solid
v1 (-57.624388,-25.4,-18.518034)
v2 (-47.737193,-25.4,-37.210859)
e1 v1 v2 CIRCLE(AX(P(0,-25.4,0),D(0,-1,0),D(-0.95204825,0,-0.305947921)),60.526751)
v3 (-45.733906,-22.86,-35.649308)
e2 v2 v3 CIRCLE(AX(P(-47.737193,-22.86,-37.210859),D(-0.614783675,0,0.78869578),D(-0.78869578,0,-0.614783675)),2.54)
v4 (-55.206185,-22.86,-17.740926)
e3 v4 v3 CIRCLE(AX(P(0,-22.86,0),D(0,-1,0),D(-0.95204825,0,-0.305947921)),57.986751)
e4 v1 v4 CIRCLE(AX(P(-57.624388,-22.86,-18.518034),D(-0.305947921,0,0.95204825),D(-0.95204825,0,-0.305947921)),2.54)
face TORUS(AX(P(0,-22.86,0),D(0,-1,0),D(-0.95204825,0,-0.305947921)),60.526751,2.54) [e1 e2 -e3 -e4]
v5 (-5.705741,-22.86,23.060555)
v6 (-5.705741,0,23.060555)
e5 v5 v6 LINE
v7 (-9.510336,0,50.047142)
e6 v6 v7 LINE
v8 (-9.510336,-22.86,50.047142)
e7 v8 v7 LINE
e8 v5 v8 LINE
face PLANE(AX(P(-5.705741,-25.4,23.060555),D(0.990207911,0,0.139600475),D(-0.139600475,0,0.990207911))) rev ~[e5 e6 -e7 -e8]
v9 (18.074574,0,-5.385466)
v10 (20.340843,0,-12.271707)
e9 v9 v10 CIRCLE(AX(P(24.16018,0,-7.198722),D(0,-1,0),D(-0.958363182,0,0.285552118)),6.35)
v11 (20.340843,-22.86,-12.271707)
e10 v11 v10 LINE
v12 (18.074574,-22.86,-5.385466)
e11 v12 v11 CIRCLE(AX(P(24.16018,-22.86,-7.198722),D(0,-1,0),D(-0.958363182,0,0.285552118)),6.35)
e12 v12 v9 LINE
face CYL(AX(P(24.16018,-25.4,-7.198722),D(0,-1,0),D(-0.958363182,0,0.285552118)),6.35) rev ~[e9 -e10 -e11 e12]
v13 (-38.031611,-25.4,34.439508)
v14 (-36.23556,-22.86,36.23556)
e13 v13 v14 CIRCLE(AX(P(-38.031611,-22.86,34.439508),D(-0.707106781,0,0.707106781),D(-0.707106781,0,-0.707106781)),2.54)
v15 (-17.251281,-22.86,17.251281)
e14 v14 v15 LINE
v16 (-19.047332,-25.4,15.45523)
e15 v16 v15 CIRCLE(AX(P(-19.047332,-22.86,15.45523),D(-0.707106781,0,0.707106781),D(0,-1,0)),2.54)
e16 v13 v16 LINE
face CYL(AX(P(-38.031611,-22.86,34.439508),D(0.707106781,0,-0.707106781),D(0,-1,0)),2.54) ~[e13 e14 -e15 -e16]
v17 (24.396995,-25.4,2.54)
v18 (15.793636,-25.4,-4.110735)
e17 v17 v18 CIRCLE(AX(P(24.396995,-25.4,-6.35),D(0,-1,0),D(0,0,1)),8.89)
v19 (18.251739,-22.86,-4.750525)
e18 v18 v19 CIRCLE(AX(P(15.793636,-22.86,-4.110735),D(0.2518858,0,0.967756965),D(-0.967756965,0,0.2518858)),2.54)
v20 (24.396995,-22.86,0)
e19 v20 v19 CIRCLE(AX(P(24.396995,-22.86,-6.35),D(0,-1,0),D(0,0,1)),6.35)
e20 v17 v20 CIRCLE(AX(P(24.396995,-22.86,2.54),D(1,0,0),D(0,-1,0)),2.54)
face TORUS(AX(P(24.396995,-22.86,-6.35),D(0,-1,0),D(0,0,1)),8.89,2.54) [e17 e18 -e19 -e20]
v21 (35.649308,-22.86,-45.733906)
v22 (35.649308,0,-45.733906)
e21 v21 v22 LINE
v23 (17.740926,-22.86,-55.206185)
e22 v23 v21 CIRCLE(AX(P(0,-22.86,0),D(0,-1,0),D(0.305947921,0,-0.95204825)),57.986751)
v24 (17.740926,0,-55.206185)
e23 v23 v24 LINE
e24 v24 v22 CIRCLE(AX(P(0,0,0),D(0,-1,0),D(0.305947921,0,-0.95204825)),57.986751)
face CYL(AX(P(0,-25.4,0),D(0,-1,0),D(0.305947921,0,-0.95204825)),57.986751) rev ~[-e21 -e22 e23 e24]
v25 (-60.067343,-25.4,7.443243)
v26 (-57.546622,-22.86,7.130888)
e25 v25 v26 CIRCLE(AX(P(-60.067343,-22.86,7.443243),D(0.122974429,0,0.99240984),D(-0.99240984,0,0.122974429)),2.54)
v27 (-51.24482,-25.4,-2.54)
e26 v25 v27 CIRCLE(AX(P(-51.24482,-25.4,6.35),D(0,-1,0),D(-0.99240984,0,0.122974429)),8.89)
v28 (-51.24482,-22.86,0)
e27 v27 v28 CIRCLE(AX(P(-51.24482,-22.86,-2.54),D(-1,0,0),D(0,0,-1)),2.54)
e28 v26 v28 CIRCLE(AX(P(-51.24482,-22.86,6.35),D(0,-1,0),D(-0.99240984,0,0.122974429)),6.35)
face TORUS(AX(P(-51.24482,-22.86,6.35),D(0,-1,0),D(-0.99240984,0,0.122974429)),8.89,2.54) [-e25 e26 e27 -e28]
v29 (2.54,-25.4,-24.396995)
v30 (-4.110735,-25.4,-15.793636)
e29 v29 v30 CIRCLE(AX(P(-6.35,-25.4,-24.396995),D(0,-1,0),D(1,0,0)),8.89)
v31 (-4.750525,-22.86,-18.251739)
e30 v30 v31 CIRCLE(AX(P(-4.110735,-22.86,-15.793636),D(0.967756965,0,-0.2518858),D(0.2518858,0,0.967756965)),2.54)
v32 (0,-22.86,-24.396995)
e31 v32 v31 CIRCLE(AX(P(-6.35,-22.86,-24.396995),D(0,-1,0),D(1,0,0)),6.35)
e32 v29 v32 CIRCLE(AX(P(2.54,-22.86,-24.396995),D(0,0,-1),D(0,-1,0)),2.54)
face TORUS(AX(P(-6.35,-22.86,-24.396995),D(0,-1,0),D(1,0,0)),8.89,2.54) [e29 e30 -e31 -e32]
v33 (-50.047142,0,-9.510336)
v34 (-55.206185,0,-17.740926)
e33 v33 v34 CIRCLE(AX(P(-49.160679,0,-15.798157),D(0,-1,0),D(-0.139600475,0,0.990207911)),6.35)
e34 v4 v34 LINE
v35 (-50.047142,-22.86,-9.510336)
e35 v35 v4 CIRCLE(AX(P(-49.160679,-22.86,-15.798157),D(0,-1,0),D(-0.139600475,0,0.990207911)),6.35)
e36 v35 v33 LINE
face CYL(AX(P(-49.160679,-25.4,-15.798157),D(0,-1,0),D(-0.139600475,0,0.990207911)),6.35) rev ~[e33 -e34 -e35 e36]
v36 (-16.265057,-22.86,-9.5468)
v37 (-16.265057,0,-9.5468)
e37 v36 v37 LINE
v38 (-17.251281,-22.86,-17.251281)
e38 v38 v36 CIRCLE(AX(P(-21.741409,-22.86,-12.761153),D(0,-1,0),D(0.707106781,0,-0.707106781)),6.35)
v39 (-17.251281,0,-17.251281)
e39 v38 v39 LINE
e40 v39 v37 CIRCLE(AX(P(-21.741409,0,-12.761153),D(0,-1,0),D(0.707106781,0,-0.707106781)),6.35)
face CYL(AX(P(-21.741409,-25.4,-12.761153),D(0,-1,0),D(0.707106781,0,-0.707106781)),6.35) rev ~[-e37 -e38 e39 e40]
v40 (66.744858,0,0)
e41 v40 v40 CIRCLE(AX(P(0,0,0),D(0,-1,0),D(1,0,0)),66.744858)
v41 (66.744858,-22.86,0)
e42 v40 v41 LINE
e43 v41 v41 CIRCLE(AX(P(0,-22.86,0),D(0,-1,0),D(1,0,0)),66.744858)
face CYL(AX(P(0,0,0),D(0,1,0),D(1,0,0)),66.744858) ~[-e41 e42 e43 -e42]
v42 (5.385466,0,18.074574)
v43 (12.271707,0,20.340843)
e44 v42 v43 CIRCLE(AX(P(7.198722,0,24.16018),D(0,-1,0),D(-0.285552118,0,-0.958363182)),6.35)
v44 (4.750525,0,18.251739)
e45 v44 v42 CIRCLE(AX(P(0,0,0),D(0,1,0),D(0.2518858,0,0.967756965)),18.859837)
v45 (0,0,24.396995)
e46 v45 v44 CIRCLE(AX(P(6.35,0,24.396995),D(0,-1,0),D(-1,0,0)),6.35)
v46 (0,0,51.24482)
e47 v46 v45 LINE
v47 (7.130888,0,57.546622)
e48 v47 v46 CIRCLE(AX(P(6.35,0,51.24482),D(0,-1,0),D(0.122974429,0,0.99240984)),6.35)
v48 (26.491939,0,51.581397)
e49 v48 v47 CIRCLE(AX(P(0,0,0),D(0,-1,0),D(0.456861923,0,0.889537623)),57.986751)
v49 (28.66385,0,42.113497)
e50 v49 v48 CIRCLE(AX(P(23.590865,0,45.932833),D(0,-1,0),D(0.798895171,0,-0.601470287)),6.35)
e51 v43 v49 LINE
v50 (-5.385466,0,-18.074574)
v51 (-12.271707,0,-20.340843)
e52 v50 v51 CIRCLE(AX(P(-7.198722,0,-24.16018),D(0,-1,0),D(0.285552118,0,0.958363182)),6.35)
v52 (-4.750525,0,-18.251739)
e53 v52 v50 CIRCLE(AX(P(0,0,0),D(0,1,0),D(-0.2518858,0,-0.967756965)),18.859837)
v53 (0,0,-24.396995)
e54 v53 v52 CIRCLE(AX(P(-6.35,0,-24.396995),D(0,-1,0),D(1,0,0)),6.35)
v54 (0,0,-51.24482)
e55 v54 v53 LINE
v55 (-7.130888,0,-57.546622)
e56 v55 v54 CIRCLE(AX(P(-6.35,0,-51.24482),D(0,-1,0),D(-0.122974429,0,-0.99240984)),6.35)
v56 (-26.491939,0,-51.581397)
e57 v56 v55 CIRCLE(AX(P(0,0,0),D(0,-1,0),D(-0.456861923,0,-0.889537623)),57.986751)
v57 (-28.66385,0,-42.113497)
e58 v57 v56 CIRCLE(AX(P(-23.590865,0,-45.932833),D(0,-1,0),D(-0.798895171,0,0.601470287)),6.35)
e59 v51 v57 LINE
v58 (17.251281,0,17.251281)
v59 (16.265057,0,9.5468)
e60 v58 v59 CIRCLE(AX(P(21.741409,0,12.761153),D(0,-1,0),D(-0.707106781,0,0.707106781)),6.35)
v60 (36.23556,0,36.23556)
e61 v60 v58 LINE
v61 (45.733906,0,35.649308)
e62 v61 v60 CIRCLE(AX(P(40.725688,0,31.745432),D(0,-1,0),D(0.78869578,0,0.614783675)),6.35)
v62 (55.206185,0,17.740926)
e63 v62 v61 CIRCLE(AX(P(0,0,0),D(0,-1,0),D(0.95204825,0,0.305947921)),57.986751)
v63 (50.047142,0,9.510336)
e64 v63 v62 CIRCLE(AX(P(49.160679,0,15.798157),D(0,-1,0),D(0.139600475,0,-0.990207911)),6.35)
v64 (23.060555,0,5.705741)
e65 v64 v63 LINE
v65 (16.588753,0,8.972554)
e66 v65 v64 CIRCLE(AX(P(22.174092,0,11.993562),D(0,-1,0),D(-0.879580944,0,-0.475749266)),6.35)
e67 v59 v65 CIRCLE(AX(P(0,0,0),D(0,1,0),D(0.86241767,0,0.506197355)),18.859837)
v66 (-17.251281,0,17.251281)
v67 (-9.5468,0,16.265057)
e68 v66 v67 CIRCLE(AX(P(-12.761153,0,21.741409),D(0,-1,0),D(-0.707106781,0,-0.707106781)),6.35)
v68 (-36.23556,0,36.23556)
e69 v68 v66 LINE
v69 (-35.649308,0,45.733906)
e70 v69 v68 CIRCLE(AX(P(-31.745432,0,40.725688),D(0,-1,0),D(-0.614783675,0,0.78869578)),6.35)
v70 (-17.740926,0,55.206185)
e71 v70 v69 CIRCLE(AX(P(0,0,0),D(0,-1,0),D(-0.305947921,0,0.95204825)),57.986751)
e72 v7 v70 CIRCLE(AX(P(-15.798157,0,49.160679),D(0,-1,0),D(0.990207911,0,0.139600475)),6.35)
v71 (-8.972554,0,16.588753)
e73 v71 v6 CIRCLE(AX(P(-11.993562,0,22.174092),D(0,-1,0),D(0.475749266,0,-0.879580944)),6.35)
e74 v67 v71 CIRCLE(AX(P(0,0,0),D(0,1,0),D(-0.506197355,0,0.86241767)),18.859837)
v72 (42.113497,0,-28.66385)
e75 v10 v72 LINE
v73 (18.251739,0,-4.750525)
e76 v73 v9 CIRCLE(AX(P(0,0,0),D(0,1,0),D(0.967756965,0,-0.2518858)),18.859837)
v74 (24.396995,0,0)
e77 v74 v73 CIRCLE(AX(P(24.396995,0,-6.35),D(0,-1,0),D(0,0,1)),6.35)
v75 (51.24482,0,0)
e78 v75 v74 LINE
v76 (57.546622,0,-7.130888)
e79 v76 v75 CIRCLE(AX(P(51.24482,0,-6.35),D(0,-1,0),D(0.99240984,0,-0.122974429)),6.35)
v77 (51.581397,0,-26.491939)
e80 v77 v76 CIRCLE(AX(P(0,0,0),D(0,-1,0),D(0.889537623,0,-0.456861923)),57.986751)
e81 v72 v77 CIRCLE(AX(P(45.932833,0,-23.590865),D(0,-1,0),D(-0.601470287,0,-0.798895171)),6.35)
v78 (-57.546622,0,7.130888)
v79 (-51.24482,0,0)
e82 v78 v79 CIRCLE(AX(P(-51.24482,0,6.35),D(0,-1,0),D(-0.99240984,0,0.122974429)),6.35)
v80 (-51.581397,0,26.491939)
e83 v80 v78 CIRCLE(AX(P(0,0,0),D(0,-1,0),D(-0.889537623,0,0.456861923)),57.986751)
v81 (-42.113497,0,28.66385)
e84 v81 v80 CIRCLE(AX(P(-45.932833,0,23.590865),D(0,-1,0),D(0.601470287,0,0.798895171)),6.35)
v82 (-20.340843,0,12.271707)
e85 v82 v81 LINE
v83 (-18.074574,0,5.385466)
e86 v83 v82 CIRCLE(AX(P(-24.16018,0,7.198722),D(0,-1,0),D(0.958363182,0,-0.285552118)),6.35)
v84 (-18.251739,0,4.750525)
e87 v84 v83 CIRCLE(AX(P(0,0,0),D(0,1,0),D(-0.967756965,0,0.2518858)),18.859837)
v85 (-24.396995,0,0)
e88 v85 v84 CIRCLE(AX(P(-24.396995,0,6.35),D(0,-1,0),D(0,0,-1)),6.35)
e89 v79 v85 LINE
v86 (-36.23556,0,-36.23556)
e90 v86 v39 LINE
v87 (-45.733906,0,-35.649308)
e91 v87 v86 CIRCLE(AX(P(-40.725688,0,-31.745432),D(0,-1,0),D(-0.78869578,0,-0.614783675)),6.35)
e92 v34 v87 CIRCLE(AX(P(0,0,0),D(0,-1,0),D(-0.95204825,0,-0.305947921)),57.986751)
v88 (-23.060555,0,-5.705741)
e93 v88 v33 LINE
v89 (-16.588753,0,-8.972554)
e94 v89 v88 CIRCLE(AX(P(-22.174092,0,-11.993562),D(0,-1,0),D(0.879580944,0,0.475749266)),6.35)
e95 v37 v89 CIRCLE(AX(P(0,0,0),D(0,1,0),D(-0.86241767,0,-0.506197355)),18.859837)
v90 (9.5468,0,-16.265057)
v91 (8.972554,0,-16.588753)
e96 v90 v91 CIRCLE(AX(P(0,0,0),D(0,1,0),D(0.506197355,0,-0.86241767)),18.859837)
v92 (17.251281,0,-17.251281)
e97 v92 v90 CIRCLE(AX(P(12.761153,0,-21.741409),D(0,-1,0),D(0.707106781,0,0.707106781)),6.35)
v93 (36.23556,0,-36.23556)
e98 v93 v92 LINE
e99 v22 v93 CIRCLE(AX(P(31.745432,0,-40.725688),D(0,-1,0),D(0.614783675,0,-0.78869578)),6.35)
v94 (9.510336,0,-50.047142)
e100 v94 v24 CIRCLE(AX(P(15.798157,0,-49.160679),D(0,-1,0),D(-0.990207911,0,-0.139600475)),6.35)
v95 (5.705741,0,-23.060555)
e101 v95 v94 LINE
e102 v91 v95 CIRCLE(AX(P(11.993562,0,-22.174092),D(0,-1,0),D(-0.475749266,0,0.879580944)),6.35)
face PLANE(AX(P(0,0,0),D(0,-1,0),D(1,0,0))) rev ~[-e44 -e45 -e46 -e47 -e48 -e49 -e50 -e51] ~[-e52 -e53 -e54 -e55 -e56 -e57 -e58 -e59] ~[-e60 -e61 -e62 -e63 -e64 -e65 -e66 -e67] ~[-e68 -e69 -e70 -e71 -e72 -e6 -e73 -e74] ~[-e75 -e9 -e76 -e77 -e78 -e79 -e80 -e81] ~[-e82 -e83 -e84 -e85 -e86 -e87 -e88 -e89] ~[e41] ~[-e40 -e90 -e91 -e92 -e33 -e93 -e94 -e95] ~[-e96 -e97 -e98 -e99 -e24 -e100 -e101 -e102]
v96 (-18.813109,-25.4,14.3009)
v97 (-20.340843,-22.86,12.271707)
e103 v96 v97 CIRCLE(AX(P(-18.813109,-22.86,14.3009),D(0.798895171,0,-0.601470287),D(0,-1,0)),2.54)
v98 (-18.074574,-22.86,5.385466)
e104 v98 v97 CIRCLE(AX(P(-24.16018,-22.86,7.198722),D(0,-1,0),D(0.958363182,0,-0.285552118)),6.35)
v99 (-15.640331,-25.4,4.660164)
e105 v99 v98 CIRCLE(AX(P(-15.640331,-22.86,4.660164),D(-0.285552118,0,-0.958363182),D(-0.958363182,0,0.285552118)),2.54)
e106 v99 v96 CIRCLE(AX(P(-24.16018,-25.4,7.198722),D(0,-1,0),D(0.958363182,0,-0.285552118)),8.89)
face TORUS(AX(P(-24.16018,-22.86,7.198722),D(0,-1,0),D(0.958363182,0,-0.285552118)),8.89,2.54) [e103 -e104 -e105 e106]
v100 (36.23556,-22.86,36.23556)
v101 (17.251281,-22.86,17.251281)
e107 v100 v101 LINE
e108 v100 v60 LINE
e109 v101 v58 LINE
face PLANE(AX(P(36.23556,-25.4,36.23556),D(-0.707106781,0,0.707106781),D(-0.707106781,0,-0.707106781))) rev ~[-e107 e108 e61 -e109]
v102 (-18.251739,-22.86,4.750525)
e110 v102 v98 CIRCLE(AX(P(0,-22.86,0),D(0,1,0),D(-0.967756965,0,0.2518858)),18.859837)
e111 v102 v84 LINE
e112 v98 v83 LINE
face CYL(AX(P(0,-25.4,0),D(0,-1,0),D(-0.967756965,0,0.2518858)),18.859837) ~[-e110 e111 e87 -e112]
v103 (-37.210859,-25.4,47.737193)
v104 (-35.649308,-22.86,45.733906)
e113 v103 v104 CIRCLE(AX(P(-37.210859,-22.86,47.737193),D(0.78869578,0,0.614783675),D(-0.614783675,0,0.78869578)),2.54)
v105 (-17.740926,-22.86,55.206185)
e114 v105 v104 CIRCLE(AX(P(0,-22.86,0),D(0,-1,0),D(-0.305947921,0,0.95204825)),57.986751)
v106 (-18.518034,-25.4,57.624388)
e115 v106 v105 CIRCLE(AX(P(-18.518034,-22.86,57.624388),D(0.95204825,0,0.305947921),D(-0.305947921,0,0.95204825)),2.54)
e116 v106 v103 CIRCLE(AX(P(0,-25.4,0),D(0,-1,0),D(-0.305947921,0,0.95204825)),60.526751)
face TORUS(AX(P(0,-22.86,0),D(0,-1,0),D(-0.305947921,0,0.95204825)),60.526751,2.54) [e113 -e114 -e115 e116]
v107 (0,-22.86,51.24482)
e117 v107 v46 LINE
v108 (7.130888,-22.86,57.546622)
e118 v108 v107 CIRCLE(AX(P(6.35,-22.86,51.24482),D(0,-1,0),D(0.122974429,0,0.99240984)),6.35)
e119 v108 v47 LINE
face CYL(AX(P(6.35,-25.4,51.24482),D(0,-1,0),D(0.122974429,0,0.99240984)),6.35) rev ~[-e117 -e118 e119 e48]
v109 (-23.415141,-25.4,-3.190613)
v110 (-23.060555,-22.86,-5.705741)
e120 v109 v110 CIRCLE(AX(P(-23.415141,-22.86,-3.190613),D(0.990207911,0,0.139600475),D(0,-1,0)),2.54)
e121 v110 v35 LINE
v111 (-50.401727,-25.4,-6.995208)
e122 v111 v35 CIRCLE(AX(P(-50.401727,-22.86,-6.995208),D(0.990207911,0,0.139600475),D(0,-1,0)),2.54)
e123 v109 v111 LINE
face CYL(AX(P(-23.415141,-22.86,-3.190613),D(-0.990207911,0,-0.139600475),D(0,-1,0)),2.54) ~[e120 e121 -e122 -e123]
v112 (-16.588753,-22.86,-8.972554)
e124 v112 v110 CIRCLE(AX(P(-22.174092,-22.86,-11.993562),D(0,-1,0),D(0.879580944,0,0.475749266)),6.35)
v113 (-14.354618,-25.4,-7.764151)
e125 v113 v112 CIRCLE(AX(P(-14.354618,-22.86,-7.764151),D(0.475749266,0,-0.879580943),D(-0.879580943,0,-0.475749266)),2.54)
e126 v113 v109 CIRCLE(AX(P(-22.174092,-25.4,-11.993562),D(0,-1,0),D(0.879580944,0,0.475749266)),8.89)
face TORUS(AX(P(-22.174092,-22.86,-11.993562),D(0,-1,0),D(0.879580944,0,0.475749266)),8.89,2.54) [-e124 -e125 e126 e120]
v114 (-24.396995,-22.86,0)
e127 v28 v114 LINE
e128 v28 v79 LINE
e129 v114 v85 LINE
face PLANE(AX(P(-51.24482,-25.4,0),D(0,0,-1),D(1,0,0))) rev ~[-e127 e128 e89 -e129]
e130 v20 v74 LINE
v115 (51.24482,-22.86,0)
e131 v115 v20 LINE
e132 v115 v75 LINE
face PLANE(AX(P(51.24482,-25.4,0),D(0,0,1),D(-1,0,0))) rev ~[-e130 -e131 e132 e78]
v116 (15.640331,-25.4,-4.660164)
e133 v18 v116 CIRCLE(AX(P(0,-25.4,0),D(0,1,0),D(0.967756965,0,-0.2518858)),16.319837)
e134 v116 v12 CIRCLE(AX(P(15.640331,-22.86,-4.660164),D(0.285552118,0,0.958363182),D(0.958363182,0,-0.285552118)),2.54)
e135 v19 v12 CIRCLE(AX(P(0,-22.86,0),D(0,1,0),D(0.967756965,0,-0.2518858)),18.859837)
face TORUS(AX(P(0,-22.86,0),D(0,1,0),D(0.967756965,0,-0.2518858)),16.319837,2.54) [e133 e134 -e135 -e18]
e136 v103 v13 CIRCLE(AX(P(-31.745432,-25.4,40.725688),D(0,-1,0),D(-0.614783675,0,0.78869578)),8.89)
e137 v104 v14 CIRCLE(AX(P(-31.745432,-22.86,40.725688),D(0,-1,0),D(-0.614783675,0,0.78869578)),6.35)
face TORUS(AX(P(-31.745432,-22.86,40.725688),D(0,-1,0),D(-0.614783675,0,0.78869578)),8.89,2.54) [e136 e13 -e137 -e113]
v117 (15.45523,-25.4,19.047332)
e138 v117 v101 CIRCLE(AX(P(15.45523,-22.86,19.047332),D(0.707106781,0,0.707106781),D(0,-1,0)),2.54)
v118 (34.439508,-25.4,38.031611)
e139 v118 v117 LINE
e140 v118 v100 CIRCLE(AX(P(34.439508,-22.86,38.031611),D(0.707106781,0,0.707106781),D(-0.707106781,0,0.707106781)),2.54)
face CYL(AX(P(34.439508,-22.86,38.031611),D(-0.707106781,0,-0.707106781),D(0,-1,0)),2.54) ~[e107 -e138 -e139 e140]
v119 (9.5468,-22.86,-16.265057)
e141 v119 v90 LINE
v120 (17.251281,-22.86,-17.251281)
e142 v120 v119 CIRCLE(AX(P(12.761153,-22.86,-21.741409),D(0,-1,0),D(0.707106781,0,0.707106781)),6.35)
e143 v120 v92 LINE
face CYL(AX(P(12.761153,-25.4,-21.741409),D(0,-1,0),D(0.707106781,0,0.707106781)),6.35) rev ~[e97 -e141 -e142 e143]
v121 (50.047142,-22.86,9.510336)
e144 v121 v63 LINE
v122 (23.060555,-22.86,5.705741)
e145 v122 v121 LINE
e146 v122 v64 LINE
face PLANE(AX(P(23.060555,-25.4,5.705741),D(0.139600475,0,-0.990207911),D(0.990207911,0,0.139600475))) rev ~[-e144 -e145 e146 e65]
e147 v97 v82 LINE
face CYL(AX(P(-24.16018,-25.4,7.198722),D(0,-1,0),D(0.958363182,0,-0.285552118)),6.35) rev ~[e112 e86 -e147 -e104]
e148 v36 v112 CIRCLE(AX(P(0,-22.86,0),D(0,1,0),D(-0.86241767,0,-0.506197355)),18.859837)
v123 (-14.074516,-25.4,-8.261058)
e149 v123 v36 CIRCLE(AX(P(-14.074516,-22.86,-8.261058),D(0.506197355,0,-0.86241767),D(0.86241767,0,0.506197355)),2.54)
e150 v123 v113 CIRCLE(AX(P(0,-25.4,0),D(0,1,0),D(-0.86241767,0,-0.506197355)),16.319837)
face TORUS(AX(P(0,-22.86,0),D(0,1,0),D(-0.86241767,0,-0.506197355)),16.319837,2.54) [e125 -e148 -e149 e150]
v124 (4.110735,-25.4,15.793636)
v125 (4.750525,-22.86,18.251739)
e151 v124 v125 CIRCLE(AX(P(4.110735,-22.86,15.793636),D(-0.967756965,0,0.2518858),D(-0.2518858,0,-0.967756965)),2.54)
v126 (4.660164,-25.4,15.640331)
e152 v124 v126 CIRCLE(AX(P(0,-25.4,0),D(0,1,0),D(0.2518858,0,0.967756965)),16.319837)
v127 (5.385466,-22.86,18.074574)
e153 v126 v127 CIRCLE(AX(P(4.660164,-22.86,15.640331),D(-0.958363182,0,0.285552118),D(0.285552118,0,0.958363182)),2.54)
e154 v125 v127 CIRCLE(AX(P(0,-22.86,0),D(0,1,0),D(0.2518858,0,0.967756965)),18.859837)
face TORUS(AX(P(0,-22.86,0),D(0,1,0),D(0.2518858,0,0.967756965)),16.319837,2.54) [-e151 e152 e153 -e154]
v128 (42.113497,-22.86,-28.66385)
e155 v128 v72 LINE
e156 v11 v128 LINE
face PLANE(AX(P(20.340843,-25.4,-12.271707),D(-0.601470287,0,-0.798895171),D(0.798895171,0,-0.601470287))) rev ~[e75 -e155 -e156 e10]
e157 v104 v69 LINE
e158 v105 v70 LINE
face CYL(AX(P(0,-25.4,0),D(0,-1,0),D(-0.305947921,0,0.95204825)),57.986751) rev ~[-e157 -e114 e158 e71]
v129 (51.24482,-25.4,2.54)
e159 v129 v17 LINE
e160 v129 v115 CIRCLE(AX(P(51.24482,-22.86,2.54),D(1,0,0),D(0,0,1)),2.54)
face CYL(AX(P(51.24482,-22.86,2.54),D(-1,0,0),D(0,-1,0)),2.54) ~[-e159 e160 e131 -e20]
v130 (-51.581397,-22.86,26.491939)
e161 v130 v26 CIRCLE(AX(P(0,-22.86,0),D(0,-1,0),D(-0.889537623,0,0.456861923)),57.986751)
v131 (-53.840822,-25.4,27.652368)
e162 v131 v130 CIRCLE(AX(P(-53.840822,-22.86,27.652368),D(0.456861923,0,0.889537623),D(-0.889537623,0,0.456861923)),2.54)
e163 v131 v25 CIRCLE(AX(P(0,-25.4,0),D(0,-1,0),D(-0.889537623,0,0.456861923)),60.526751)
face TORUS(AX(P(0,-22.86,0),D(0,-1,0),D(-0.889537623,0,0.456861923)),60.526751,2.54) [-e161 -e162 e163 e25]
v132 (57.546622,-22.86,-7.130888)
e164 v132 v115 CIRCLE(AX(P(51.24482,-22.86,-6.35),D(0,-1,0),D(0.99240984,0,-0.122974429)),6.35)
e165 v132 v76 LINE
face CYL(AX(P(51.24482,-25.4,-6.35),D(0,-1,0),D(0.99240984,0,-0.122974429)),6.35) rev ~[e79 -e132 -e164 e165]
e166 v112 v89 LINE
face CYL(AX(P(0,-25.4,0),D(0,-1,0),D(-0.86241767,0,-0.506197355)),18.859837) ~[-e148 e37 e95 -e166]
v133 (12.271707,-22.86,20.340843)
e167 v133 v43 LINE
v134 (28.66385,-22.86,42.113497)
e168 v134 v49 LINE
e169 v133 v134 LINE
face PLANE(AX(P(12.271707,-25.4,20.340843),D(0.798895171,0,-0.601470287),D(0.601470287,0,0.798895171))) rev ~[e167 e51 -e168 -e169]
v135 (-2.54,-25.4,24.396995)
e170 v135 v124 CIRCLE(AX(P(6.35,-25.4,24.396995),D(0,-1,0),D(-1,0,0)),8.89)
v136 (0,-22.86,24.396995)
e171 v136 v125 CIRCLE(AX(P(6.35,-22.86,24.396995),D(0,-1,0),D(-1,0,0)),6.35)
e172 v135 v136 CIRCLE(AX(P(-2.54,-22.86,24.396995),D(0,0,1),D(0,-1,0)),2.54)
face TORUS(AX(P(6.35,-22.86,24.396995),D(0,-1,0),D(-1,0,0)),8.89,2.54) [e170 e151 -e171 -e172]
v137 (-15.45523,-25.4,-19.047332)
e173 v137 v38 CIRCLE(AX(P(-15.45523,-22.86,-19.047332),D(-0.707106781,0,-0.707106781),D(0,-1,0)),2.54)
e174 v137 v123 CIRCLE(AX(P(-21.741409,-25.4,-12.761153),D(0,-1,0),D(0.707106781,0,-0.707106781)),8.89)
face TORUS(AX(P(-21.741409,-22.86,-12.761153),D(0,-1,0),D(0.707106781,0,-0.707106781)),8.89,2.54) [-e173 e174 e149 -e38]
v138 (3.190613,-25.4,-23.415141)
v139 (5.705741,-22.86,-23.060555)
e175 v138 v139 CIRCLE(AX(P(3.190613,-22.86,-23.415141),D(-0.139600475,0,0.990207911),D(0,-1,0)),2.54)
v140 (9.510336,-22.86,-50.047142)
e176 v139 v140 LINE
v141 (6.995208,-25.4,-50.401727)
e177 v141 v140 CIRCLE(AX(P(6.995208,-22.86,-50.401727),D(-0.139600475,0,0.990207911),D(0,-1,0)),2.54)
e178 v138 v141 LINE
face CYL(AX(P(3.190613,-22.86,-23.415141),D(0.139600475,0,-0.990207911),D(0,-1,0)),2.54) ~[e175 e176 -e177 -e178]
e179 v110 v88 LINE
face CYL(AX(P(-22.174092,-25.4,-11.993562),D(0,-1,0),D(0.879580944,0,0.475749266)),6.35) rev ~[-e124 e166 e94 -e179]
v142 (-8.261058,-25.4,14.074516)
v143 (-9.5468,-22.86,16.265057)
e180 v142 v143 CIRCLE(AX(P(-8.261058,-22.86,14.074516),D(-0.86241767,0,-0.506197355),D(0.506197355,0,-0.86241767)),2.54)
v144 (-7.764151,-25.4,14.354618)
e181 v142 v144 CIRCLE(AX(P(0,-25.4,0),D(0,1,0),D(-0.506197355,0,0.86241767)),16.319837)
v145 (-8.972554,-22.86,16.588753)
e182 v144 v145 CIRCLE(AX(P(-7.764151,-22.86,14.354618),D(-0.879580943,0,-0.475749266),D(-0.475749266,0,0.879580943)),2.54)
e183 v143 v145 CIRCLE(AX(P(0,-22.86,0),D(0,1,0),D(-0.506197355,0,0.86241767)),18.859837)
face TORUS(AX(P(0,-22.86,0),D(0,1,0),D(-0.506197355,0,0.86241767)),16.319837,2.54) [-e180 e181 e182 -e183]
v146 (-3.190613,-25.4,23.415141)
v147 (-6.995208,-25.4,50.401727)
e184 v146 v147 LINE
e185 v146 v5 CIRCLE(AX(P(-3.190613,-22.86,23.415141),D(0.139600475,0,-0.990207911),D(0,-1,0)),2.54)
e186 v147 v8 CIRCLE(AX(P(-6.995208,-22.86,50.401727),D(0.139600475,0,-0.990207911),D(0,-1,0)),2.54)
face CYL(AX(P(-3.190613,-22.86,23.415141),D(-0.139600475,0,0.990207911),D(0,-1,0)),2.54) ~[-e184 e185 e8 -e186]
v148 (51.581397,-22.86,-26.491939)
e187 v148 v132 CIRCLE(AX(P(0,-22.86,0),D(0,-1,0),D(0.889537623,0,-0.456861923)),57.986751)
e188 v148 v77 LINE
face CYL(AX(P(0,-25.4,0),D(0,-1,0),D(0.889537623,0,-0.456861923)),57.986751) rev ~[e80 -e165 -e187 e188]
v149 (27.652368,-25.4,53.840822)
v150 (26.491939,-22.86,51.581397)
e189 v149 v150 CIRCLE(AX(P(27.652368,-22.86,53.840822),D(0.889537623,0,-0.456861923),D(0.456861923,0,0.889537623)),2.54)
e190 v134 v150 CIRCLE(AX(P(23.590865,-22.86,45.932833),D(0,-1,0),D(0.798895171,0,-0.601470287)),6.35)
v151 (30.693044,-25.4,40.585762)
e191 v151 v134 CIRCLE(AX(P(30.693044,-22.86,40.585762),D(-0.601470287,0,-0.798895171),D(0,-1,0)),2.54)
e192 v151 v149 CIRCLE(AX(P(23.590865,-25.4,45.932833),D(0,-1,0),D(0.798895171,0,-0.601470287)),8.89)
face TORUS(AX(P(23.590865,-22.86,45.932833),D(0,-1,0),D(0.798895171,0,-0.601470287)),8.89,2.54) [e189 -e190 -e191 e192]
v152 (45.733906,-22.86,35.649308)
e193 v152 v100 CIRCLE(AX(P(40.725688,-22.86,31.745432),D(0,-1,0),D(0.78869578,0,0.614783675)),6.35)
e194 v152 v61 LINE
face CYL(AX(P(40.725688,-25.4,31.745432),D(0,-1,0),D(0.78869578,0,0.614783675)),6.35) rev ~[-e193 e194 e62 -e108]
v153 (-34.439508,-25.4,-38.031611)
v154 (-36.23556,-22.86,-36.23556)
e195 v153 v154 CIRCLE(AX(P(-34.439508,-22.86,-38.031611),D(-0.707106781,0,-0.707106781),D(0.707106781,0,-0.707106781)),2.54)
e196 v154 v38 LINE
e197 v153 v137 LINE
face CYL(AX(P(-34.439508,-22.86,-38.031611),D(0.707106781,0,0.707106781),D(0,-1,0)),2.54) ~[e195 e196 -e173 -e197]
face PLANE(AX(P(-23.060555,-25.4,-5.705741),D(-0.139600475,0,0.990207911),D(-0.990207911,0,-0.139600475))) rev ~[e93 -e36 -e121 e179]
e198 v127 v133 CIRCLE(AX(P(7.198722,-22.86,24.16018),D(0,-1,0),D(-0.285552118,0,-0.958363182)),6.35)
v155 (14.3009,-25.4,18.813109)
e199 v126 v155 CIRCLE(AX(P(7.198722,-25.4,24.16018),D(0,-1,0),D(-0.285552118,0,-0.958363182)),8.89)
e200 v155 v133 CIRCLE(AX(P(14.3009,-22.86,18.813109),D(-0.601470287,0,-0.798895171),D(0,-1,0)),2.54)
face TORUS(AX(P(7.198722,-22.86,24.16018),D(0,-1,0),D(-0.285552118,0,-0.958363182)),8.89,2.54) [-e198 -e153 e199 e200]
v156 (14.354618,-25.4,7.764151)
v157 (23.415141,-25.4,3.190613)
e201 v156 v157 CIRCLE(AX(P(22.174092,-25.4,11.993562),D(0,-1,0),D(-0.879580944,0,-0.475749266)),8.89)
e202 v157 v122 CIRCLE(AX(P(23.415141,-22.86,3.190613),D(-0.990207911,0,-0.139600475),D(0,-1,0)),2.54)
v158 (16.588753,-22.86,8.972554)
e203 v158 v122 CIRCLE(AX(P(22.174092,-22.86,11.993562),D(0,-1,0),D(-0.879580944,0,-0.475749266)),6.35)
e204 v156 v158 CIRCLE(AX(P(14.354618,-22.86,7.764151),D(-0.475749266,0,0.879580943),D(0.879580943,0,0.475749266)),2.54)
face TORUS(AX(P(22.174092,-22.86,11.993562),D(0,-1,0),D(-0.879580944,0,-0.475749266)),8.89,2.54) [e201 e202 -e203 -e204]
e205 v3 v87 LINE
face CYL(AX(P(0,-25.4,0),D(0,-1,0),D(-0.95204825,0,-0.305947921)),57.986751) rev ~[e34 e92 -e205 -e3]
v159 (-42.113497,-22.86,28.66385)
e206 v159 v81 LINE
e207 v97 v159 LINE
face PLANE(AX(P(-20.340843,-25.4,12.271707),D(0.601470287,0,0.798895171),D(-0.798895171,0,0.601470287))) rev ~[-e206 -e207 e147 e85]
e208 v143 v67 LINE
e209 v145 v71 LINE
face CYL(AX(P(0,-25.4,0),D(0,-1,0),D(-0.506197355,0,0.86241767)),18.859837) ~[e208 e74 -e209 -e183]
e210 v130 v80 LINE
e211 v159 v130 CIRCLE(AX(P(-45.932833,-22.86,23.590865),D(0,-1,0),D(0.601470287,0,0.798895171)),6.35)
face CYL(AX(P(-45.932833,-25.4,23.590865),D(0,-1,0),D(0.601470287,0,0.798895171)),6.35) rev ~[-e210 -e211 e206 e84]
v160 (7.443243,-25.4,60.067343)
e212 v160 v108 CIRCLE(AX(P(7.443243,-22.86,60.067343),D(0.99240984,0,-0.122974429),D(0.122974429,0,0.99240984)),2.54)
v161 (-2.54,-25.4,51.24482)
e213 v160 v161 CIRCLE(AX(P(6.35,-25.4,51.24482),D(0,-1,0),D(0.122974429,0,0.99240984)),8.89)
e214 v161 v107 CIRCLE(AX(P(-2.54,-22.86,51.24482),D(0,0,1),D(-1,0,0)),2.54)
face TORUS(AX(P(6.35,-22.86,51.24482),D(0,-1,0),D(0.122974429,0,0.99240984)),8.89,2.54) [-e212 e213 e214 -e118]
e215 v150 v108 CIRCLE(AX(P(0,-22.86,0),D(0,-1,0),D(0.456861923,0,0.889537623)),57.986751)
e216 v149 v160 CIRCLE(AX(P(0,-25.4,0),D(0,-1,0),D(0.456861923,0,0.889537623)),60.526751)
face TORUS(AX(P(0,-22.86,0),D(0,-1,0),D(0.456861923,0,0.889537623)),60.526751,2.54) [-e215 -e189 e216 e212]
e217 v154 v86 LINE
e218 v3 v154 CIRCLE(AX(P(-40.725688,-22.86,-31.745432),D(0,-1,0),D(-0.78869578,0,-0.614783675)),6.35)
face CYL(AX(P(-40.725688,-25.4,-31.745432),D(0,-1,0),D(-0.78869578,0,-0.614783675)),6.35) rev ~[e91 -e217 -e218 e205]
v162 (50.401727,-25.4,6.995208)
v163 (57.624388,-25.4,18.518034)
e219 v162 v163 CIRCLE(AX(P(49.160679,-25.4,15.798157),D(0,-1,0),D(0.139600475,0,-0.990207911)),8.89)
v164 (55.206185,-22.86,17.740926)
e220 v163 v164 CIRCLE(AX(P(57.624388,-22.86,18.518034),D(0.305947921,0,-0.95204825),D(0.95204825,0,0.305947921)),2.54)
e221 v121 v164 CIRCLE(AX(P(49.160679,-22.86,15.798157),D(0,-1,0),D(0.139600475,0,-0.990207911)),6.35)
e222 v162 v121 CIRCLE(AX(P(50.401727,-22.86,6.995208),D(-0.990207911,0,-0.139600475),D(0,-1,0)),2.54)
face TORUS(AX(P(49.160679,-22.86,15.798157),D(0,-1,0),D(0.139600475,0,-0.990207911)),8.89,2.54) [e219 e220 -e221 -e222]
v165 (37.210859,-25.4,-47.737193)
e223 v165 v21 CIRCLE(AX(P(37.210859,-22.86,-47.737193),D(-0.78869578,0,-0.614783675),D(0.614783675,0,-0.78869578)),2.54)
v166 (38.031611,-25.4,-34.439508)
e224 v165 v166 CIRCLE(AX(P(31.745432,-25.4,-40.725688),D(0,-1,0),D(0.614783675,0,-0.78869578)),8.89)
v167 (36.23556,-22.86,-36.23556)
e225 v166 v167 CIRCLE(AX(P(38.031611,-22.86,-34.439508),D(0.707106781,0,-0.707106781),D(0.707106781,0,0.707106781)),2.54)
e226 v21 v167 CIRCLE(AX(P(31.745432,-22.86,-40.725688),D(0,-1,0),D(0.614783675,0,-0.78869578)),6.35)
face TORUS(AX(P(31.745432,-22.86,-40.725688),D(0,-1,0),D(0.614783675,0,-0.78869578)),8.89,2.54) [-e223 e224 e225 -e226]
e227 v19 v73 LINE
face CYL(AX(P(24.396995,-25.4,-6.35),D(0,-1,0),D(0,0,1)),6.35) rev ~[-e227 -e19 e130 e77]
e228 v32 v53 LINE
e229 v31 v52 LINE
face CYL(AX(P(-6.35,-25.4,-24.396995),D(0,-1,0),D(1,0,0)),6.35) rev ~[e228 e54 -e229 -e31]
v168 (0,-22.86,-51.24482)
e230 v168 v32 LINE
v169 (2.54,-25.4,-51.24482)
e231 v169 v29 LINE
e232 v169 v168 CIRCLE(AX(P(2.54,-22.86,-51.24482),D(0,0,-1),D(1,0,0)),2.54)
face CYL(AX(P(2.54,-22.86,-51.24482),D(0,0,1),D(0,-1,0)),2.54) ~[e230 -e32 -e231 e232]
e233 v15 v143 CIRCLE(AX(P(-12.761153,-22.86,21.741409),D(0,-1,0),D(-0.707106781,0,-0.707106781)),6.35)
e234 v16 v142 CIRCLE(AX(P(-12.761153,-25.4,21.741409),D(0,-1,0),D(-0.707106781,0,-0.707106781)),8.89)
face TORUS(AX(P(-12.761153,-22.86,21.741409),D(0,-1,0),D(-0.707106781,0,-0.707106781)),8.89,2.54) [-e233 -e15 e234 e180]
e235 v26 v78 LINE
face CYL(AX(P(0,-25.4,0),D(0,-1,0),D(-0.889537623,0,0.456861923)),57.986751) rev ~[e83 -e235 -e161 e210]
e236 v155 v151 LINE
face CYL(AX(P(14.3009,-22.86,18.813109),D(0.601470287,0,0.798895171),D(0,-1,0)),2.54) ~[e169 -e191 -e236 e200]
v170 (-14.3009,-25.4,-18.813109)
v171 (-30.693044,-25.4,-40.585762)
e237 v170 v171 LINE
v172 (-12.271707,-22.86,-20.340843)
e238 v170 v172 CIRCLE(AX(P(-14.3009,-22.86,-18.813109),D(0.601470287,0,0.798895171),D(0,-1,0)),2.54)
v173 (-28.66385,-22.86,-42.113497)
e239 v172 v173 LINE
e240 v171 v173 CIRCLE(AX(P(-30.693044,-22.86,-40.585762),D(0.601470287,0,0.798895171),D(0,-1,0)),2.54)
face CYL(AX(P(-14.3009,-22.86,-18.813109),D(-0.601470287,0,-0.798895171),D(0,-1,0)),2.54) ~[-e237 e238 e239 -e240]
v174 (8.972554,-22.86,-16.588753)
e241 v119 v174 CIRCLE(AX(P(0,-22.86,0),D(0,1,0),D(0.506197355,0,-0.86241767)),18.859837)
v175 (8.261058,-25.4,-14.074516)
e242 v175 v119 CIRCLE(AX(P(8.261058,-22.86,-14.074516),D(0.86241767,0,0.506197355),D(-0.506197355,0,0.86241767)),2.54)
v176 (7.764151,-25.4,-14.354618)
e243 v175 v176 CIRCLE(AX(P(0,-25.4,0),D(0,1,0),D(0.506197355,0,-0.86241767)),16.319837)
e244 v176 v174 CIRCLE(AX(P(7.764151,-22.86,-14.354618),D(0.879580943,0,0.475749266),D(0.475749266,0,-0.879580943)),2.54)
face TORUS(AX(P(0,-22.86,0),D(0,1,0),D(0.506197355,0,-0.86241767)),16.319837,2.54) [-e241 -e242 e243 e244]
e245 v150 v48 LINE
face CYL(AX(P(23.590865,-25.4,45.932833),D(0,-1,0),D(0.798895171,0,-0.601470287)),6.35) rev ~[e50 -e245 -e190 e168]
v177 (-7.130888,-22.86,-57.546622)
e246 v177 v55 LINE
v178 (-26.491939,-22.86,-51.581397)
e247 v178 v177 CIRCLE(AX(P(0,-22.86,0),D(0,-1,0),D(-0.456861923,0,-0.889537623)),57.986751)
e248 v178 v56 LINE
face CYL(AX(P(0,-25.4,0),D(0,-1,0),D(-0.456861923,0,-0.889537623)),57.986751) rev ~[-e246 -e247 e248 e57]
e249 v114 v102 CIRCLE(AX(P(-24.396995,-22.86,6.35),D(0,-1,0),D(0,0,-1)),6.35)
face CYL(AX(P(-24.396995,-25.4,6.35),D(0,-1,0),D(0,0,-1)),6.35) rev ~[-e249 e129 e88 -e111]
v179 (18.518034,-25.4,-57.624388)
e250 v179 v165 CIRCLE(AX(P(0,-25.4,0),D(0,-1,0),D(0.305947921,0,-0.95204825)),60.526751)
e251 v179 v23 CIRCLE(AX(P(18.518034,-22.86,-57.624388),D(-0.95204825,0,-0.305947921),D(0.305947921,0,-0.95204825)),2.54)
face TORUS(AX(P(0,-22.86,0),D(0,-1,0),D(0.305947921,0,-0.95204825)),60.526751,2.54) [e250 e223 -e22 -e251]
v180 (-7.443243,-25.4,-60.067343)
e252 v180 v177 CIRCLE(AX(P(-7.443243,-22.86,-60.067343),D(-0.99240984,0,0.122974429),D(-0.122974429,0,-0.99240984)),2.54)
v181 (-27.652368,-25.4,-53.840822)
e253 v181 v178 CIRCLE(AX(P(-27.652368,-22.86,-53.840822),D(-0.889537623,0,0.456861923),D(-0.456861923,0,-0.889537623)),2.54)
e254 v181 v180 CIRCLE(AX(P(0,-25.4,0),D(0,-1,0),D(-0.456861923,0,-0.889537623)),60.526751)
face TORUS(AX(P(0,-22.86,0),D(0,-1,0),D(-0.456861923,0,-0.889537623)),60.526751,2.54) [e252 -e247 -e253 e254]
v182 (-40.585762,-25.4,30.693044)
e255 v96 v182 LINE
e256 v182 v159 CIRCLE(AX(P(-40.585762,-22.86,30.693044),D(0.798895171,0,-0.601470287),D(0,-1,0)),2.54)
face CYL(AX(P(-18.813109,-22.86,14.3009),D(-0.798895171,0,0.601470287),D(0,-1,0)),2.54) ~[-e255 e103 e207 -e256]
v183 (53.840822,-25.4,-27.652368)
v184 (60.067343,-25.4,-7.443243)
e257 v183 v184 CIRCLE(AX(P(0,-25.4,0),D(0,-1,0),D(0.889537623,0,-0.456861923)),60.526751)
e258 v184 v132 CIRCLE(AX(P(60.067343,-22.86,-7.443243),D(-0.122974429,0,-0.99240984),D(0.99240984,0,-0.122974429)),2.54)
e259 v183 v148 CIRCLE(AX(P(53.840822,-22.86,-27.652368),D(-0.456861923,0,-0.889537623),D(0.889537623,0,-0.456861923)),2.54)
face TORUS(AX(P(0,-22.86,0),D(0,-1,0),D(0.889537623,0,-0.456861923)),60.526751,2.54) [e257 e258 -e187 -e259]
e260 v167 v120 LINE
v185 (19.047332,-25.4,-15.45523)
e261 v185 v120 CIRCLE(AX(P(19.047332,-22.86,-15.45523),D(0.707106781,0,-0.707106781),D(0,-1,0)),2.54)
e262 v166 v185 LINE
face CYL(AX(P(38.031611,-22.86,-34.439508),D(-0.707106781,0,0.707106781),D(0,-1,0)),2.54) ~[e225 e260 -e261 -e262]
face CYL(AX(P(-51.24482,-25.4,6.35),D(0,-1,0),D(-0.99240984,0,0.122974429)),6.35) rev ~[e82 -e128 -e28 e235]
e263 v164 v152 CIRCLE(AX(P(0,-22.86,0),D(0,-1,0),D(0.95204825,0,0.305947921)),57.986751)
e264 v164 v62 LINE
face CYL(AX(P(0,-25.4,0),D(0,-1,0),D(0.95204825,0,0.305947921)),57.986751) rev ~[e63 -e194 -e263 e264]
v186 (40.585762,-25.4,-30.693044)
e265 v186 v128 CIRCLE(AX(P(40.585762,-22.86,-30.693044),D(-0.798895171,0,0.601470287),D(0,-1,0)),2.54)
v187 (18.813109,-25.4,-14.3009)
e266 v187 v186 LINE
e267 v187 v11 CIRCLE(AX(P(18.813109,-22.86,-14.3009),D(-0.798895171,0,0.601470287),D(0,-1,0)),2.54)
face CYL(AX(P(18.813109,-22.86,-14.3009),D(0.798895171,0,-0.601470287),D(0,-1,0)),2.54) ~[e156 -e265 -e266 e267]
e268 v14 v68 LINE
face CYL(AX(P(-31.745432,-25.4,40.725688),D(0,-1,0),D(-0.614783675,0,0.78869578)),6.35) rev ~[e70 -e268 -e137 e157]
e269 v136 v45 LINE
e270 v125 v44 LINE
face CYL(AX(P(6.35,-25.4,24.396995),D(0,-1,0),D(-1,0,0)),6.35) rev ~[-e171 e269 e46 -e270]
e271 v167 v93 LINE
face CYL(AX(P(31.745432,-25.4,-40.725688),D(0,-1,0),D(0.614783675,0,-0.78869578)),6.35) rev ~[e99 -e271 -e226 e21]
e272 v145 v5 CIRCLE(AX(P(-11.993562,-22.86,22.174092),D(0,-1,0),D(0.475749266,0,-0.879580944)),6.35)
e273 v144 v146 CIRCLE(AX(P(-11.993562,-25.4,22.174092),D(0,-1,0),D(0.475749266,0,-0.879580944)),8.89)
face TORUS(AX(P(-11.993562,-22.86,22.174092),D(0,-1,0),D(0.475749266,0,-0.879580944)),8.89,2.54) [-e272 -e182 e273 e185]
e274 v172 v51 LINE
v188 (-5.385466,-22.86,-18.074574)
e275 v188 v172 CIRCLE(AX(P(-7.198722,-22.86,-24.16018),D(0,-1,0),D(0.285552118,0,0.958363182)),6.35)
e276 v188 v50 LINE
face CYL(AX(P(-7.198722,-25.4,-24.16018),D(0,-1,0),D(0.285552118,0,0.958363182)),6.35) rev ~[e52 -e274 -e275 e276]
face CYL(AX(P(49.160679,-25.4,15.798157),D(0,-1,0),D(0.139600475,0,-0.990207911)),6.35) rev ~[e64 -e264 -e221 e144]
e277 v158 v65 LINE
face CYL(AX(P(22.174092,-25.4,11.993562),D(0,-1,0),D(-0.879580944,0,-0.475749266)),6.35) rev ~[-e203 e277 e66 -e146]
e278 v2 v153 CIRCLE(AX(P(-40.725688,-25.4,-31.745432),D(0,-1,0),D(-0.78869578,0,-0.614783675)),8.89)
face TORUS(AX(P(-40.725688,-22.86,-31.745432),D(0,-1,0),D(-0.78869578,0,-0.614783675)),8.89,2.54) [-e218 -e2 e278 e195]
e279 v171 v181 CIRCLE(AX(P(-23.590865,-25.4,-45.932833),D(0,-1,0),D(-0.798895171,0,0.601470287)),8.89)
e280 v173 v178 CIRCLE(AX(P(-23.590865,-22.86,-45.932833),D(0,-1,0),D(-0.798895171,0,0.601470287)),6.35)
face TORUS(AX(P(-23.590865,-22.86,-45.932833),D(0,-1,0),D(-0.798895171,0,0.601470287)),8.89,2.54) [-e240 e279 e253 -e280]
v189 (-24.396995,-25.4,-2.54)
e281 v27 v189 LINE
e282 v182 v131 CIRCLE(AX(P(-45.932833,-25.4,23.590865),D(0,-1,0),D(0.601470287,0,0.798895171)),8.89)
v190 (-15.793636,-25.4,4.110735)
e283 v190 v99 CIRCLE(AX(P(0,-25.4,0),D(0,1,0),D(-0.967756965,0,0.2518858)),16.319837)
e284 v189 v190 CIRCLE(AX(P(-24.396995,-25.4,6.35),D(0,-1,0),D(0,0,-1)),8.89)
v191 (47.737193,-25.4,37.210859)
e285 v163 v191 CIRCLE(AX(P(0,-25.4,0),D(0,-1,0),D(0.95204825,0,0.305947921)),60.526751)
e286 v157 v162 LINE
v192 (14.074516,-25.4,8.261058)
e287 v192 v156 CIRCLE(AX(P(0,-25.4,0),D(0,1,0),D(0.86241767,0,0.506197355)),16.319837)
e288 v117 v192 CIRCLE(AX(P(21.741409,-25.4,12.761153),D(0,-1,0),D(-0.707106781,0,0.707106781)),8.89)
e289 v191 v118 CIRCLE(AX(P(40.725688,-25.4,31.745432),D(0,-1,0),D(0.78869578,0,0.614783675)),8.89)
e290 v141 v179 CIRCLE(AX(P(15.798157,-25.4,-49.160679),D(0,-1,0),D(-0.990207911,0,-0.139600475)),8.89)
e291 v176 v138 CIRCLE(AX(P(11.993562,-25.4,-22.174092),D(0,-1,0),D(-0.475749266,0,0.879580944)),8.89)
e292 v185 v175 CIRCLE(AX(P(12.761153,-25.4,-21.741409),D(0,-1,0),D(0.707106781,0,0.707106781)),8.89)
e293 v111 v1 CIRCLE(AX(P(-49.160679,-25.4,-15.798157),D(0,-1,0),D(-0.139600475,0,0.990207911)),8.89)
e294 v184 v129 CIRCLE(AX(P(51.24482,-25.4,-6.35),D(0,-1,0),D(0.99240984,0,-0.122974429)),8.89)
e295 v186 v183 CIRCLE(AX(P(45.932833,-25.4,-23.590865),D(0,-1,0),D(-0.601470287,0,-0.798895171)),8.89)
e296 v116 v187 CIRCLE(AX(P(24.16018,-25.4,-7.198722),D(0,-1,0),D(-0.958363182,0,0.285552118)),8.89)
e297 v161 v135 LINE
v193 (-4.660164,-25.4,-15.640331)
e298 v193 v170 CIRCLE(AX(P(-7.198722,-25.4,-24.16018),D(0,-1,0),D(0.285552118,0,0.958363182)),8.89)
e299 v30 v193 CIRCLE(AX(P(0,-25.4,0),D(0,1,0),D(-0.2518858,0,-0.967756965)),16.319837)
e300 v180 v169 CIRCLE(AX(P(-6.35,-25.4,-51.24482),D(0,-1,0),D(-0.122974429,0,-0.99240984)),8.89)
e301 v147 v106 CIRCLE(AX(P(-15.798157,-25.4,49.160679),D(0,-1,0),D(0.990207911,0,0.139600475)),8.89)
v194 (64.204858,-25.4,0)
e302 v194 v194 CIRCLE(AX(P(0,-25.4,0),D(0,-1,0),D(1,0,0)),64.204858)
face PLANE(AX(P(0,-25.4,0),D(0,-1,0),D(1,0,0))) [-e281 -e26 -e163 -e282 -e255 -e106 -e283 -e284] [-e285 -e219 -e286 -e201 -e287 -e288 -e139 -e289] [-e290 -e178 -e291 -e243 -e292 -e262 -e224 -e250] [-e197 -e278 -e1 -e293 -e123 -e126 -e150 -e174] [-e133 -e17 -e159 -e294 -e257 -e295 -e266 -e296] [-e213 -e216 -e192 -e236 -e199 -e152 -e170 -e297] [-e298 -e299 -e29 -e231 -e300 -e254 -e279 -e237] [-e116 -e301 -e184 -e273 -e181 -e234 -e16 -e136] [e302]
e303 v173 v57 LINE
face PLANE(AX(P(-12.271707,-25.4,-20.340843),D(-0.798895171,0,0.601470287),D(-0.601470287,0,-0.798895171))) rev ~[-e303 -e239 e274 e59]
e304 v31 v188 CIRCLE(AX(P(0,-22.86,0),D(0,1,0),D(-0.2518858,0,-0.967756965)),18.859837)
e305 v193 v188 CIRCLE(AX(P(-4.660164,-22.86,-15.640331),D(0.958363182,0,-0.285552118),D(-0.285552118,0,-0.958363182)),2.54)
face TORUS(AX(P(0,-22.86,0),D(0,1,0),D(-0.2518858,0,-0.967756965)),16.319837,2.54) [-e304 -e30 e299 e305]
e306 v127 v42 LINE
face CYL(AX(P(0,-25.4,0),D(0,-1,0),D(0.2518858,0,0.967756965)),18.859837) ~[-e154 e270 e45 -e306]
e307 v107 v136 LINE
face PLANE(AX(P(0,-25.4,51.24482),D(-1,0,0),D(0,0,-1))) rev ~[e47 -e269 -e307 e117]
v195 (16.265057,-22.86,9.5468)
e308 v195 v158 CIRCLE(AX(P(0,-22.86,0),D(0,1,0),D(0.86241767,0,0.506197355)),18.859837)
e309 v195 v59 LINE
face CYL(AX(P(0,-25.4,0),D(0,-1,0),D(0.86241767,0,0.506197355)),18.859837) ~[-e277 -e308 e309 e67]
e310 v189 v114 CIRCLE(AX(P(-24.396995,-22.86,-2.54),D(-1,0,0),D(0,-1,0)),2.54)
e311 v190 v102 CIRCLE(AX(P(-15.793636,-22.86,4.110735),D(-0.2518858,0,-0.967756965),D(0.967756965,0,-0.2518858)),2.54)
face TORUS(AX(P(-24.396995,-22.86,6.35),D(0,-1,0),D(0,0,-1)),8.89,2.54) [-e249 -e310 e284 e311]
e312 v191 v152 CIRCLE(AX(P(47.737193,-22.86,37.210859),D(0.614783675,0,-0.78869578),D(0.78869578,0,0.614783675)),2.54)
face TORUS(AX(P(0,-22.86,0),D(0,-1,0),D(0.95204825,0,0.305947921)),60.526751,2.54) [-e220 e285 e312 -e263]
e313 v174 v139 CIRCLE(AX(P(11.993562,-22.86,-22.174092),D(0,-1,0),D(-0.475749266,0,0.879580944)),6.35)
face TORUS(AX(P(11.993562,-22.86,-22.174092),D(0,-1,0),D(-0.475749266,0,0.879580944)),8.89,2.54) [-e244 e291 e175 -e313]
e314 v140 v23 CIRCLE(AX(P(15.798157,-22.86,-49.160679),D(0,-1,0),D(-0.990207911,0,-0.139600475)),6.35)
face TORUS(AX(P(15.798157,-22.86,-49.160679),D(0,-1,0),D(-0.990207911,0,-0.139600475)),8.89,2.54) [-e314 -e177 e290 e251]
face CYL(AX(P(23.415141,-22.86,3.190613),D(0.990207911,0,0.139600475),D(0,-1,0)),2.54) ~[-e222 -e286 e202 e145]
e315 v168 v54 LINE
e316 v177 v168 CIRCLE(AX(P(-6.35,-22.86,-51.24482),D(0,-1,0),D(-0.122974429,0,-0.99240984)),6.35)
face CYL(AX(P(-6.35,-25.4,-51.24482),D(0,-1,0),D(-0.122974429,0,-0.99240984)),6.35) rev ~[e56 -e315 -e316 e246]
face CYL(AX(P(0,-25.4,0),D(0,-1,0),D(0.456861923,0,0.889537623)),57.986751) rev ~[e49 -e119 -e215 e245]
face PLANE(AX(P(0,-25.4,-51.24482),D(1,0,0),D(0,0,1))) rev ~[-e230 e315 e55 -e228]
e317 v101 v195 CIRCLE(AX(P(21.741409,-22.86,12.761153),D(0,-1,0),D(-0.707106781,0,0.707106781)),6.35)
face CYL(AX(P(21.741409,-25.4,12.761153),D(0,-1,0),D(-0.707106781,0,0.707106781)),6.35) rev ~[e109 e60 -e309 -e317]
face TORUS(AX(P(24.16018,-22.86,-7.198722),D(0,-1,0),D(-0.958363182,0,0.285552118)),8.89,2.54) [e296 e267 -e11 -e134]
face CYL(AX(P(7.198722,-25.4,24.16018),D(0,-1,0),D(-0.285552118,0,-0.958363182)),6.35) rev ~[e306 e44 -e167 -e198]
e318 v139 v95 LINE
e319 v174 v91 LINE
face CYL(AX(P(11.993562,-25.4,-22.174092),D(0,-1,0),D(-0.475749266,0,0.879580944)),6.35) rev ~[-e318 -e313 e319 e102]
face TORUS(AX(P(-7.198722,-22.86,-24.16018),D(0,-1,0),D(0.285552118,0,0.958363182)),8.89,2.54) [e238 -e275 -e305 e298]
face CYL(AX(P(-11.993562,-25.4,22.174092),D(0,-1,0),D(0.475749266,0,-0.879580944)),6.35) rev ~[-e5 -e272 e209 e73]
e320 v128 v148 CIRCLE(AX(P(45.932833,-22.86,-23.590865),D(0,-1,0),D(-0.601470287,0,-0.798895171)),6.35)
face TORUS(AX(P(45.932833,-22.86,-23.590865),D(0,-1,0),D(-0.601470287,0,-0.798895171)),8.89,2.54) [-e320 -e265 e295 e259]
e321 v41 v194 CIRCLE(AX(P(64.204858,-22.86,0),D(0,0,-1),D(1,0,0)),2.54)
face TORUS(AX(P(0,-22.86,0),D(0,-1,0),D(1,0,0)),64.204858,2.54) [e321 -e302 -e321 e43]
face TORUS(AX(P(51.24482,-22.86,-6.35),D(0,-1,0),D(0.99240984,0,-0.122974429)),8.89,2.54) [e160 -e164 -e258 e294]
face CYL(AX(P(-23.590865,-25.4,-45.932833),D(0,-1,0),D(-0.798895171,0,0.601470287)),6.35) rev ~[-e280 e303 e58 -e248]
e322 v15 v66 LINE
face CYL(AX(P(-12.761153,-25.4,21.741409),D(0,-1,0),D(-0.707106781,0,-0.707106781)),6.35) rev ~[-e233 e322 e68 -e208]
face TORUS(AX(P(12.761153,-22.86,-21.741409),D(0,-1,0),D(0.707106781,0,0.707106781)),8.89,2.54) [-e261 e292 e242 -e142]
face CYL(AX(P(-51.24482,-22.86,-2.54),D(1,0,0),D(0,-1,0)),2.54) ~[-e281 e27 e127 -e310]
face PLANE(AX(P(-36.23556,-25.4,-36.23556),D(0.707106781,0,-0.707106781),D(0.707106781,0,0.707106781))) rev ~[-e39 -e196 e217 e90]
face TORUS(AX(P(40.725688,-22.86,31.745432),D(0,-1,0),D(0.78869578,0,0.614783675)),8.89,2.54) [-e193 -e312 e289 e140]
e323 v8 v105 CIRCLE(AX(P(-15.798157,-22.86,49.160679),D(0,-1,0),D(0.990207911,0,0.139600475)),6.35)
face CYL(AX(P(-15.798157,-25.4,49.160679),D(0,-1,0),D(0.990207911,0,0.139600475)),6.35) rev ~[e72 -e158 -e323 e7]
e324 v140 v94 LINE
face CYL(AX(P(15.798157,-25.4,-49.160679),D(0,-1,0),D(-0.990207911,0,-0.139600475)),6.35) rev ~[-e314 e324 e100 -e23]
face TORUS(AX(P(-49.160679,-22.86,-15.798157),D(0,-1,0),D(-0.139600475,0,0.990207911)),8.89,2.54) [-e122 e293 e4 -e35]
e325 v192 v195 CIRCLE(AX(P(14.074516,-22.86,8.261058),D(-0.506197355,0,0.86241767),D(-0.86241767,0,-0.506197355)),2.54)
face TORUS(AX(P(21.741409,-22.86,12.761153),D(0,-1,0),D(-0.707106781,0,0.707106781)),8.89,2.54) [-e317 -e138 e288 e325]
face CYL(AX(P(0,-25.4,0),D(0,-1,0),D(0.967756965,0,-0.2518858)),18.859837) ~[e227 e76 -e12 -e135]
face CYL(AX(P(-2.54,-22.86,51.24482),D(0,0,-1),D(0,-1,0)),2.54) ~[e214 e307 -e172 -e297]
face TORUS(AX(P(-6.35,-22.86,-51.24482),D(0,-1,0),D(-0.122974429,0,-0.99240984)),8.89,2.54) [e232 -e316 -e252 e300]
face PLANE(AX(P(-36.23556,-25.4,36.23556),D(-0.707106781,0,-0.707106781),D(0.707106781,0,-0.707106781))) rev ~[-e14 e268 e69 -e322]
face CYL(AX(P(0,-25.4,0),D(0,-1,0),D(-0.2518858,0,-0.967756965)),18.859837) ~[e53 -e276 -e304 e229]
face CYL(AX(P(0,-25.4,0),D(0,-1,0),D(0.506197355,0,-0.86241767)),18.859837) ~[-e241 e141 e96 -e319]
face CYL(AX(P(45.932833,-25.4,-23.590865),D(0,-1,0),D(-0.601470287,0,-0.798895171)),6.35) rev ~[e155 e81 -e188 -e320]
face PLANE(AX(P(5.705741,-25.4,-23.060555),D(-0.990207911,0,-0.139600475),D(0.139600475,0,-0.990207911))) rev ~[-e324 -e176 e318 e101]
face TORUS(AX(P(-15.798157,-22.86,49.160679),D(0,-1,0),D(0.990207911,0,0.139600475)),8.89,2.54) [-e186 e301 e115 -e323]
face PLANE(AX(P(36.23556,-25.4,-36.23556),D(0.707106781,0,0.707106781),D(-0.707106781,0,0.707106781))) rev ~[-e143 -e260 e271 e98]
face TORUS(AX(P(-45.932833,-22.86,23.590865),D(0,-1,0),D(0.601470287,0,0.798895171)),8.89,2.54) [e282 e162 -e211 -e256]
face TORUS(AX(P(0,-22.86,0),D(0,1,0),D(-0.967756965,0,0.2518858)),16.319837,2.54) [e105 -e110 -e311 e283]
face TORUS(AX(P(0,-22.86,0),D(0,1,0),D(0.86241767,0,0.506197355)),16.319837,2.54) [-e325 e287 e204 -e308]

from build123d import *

# Parameters (mm, degrees)
F0_R            = 66.7448575271
F1_DEPTH        = 25.4
F3_DEPTH        = 25.4
F3_COPIES_COUNT = 8
F4_R            = 2.54


# Not quite as in the source:
# - a pattern or mirror of a feature is missing from the dataset's text; its kind, count and spacing are read off the source's solid


with BuildPart() as f1:
    # F0 (on Front) → F1 (new body)
    with BuildSketch(Plane.XZ):
        Circle(F0_R)
    extrude(amount=F1_DEPTH)

    # F2 (on face) → F3 (cut)
    with BuildSketch(Plane.XZ.offset(25.4)):
        with BuildLine():
            ThreePointArc((26.4919386824, 51.5813968349), (17.0739448109, 55.4160962463), (7.1308876249, 57.5466224575))
            ThreePointArc((7.1308876249, 57.5466224575), (2.1450110831, 56.0030305859), (0, 51.2448199759))
            Line((0, 51.2448199759), (0, 24.3969954913))
            ThreePointArc((0, 24.3969954913), (1.3260988677, 20.5133223057), (4.7505251694, 18.2517387623))
            ThreePointArc((4.7505251694, 18.2517387623), (5.0687699053, 18.1659304435), (5.3854664394, 18.0745735347))
            ThreePointArc((5.3854664394, 18.0745735347), (9.183779588, 18.1284264351), (12.2717067242, 20.340843419))
            Line((12.2717067242, 20.340843419), (28.6638498057, 42.1134966086))
            ThreePointArc((28.6638498057, 42.1134966086), (29.7801046894, 47.352627939), (26.4919386824, 51.5813968349))
        make_face()
    f3 = extrude(amount=-F3_DEPTH, mode=Mode.SUBTRACT)

    # F3_copies: F3 ×8 about axis
    f3_copies_axis = Axis((0, 0, 0), (0, 1, 0))
    for i in range(1, F3_COPIES_COUNT):
        add(f3.rotate(f3_copies_axis, i * 360 / F3_COPIES_COUNT), mode=Mode.SUBTRACT)

    # F4
    f4_edges = [f1.edges().sort_by_distance(p)[0] for p in [
        (-66.744858, -25.4, 0),
        (-20.467778, -25.4, -31.22717),
        (-9.18378, -25.4, -18.128426),
        (-29.780105, -25.4, -47.352628),
        (-5.06877, -25.4, -18.16593),
        (-17.073945, -25.4, -55.416096),
        (-1.326099, -25.4, -20.513322),
        (-2.145011, -25.4, -56.003031),
        (0, -25.4, -37.820908),
        (-36.553848, -25.4, -7.608039),
        (-19.312646, -25.4, -6.32482),
        (-54.541078, -25.4, -12.42565),
        (-16.429414, -25.4, -9.261091),
        (-51.2582, -25.4, -27.111995),
        (-15.442803, -25.4, -13.567416),
        (-41.116875, -25.4, -38.083371),
        (-26.74342, -25.4, -26.74342),
        (7.608039, -25.4, -36.553848),
        (6.32482, -25.4, -19.312646),
        (12.42565, -25.4, -54.541078),
        (9.261091, -25.4, -16.429414),
        (27.111995, -25.4, -51.2582),
        (13.567416, -25.4, -15.442803),
        (38.083371, -25.4, -41.116875),
        (26.74342, -25.4, -26.74342),
        (31.22717, -25.4, -20.467778),
        (18.128426, -25.4, -9.18378),
        (47.352628, -25.4, -29.780105),
        (18.16593, -25.4, -5.06877),
        (55.416096, -25.4, -17.073945),
        (20.513322, -25.4, -1.326099),
        (56.003031, -25.4, -2.145011),
        (37.820908, -25.4, 0),
        (-31.22717, -25.4, 20.467778),
        (-18.128426, -25.4, 9.18378),
        (-47.352628, -25.4, 29.780105),
        (-18.16593, -25.4, 5.06877),
        (-55.416096, -25.4, 17.073945),
        (-20.513322, -25.4, 1.326099),
        (-56.003031, -25.4, 2.145011),
        (-37.820908, -25.4, 0),
        (-7.608039, -25.4, 36.553848),
        (-12.42565, -25.4, 54.541078),
        (-27.111995, -25.4, 51.2582),
        (-38.083371, -25.4, 41.116875),
        (-26.74342, -25.4, 26.74342),
        (-13.567416, -25.4, 15.442803),
        (-9.261091, -25.4, 16.429414),
        (-6.32482, -25.4, 19.312646),
        (36.553848, -25.4, 7.608039),
        (19.312646, -25.4, 6.32482),
        (54.541078, -25.4, 12.42565),
        (16.429414, -25.4, 9.261091),
        (51.2582, -25.4, 27.111995),
        (15.442803, -25.4, 13.567416),
        (41.116875, -25.4, 38.083371),
        (26.74342, -25.4, 26.74342),
        (20.467778, -25.4, 31.22717),
        (9.18378, -25.4, 18.128426),
        (29.780105, -25.4, 47.352628),
        (5.06877, -25.4, 18.16593),
        (17.073945, -25.4, 55.416096),
        (1.326099, -25.4, 20.513322),
        (2.145011, -25.4, 56.003031),
        (0, -25.4, 37.820908),
    ]]
    fillet(f4_edges, radius=F4_R)


solid = f1.part
